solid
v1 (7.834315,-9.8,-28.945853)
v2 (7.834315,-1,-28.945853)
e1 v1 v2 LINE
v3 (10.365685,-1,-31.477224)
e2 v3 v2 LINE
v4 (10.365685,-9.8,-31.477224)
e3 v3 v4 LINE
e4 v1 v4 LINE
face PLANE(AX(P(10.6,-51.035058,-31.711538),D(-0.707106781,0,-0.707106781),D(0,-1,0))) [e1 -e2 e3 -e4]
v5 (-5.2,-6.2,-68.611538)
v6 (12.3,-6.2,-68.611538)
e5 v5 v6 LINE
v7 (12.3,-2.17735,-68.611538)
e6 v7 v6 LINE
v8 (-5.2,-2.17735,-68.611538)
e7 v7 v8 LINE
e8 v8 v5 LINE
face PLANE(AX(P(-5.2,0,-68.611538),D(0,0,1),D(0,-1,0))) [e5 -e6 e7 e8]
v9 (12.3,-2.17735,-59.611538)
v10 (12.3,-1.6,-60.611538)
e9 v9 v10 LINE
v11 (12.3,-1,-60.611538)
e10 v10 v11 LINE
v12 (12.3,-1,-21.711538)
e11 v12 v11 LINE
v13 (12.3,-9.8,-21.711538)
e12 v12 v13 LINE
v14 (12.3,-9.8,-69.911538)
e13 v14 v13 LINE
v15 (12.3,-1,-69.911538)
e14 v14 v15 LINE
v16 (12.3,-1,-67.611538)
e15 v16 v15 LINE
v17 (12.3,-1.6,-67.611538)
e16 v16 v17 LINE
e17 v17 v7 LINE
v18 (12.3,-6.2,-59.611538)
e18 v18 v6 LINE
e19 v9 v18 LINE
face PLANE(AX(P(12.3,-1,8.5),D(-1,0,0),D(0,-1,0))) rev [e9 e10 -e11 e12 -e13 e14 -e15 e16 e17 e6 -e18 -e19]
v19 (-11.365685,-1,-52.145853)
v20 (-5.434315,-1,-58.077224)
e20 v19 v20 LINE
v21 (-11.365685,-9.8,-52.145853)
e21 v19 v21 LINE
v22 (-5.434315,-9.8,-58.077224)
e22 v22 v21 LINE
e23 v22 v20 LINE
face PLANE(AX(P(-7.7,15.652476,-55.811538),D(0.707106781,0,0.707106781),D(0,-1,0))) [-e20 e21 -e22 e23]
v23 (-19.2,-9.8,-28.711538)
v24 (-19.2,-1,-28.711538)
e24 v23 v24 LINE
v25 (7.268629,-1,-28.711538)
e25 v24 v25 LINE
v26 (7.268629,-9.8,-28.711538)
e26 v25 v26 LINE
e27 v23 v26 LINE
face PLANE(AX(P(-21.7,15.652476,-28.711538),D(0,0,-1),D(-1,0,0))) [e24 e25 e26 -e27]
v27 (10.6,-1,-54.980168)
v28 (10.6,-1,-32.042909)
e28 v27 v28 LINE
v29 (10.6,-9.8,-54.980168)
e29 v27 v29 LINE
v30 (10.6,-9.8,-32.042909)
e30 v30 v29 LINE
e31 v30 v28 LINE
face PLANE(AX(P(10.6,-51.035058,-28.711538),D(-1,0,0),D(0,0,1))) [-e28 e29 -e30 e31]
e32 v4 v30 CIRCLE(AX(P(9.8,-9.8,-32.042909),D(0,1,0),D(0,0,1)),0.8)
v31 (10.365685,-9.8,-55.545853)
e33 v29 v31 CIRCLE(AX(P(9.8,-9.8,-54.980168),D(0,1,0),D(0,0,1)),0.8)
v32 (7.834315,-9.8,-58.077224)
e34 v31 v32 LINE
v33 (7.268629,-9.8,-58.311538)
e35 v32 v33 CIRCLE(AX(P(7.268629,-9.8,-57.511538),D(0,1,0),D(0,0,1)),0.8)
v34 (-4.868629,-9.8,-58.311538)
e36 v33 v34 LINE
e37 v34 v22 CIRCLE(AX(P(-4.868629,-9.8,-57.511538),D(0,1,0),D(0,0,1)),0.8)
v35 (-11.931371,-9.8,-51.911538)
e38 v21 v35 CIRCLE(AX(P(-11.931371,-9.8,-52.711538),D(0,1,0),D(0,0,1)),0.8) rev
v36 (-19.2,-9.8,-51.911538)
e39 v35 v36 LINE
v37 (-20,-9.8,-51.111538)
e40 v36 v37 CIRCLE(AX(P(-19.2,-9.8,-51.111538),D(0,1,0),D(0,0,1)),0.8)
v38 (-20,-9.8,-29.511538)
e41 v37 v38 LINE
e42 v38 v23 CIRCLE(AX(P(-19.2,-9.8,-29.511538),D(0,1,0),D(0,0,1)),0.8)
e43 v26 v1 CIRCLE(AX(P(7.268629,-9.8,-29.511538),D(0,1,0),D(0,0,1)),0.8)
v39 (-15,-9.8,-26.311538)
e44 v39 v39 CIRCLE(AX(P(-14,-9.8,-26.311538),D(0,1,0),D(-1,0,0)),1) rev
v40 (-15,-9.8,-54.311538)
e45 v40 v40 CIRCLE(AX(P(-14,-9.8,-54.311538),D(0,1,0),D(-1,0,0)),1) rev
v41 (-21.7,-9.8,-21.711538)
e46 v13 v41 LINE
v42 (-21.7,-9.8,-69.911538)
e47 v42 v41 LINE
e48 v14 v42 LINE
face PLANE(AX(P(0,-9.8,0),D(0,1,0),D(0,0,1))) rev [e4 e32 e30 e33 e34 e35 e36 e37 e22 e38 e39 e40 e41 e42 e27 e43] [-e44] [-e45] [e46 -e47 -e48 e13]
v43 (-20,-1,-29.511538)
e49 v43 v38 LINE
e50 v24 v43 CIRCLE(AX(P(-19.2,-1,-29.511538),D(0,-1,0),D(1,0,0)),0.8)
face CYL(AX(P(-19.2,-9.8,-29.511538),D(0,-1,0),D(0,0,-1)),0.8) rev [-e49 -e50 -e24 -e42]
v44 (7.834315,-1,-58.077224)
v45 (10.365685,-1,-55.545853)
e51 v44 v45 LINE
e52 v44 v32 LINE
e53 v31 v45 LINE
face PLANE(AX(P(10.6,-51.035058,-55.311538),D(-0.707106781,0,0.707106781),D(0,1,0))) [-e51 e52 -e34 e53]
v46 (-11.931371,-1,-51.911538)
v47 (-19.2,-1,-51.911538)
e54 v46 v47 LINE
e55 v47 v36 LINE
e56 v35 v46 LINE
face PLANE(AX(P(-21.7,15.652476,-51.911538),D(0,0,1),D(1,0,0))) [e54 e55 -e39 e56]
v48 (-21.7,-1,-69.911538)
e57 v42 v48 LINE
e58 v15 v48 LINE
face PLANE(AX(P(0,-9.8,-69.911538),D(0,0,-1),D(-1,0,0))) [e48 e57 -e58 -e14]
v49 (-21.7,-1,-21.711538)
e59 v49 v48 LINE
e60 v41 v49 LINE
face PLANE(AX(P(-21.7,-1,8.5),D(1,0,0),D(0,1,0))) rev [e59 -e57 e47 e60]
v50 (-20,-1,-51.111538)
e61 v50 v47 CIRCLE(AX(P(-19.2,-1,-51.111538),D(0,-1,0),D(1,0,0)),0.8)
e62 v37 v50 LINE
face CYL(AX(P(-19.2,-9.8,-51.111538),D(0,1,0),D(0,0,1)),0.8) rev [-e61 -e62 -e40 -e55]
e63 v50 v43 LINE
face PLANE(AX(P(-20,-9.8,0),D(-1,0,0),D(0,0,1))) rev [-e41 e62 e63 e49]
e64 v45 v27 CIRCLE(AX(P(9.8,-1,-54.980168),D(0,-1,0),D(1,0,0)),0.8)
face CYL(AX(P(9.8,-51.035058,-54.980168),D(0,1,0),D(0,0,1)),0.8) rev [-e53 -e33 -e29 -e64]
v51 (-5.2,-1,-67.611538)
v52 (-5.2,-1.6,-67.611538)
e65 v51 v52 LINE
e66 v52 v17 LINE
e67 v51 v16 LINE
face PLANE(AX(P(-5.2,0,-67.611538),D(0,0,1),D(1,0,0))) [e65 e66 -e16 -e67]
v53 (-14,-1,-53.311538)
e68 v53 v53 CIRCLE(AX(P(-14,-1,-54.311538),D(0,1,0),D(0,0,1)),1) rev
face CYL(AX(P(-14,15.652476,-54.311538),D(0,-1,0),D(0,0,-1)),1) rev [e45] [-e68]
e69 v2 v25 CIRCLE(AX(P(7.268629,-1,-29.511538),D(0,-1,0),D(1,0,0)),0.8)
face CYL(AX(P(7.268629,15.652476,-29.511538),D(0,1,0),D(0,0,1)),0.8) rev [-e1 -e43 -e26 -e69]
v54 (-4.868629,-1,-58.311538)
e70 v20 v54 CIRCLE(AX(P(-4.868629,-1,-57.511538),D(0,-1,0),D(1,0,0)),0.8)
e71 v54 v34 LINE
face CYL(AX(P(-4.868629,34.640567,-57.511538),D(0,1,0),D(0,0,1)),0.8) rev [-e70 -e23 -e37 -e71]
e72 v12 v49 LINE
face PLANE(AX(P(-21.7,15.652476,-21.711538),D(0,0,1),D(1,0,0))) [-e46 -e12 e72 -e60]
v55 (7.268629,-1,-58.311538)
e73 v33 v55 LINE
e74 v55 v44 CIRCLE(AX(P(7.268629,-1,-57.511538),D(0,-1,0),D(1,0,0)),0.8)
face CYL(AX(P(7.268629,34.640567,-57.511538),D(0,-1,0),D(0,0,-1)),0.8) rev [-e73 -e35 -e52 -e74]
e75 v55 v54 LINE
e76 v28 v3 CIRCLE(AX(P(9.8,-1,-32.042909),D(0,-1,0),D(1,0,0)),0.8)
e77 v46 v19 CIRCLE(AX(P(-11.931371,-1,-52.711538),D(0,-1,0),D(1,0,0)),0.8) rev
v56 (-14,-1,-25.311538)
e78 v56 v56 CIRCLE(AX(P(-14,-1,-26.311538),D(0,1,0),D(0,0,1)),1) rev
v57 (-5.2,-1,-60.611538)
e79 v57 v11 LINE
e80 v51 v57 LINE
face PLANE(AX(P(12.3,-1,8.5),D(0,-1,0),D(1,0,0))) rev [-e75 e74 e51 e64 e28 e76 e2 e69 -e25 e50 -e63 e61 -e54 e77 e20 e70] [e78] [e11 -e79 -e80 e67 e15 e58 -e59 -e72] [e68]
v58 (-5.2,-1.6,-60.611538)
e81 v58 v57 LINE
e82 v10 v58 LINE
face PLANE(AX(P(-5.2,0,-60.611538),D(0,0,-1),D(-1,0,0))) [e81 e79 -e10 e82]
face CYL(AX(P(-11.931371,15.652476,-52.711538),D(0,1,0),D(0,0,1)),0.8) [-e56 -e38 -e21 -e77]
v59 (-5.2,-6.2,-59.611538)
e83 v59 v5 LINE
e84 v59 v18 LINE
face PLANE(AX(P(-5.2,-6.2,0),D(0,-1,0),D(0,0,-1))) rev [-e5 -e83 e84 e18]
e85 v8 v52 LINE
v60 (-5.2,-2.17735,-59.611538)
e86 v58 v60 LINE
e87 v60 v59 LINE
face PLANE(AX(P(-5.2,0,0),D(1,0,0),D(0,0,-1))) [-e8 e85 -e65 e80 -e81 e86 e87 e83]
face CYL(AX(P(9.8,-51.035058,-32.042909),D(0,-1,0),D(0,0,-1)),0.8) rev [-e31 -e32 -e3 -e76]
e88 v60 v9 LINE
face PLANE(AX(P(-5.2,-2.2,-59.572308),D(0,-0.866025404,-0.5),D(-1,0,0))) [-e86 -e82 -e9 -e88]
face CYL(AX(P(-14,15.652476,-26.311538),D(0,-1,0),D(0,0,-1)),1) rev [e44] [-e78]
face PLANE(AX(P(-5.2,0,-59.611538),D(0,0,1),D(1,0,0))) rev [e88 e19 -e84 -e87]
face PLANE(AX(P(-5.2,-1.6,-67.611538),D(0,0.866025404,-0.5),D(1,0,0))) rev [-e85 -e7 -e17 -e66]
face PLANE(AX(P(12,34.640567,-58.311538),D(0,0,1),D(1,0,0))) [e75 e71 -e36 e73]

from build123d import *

# Parameters (mm, degrees)
BOSS_EXTRUDE1_START      = -1
SKETCH1_W                = 1.7
SKETCH1_H                = 89.2
BOSS_EXTRUDE1_DEPTH      = 8.8
SKETCH4_W                = 33.7
SKETCH4_H                = 11.6
BOSS_EXTRUDE3_DEPTH      = 8.8
SERVO_HOLDER_DEPTH       = 1
SERVO_HOLDER_DEPTH_BACK  = 8.8
SKETCH3_W                = 14
SKETCH3_H                = 7
SKETCH3_R                = 1
SKETCH37_W               = 20
SKETCH37_H               = 7
BOSS_EXTRUDE19_DEPTH     = 9.8
CUT_EXTRUDE10_DEPTH      = 93.434679639
CUT_EXTRUDE10_DEPTH_BACK = 93.434679639
SKETCH29_W               = 34.409909993
SKETCH29_H               = 6.377389624
BOSS_EXTRUDE13_START     = 2
SKETCH30_W               = 34
SKETCH30_H               = 38
SKETCH30_R               = 1.6
BOSS_EXTRUDE13_DEPTH     = 6.5
SKETCH41_W               = 17.288461538
SKETCH41_H               = 8.8
CUT_EXTRUDE14_DEPTH      = 15
BOSS_EXTRUDE14_START     = -38
SKETCH32_R               = 1.45
SKETCH32_R_2             = 5
BOSS_EXTRUDE14_DEPTH     = 8.8
BOSS_EXTRUDE16_DEPTH     = 3
BOSS_EXTRUDE17_DEPTH     = 3
BOSS_EXTRUDE18_DEPTH     = 8.8
SKETCH39_W               = 1.7
SKETCH39_H               = 41.2
BOSS_EXTRUDE20_DEPTH     = 8.8
CUT_EXTRUDE13_DEPTH      = 17.5
CHAMFER2_SIZE            = 0.6
CHAMFER2_SIZE_2          = 1.039230485
CHAMFER3_SIZE            = 3
FILLET10_R               = 6
CUT_EXTRUDE15_DEPTH      = 10
CHAMFER4_SIZE            = 2.5
CUT_EXTRUDE16_DEPTH      = 10
FILLET11_R               = 0.8
SKETCH44_W               = 59.192885725
SKETCH44_H               = 45.417181718
CUT_EXTRUDE17_DEPTH      = 87.948983376


with BuildPart() as part:
    # Sketch1 → Boss-Extrude1 (new body)
    with BuildSketch(Plane(origin=(0, 0, 0), x_dir=(1, 0, 0), z_dir=(0, 1, 0)).offset(BOSS_EXTRUDE1_START)):
        with Locations((-20.85, 25.311538462)):
            Rectangle(SKETCH1_W, SKETCH1_H)
    extrude(amount=-BOSS_EXTRUDE1_DEPTH)

    # Sketch4 → Boss-Extrude3 (add)
    with BuildSketch(Plane.XZ.offset(9.8)):
        with Locations((-4.85, -64.111538462)):
            Rectangle(SKETCH4_W, SKETCH4_H)
    extrude(amount=-BOSS_EXTRUDE3_DEPTH)

    # Sketch3 → Servo Holder (add, two sides: drawn at the far end of the back side and taken through both)
    # profile 1 of 2: a face of its own
    with BuildSketch(Plane.XZ.offset(9.8).offset(-SERVO_HOLDER_DEPTH_BACK)):
        with Locations((-14.7, -55.411538462)):
            Rectangle(SKETCH3_W, SKETCH3_H)
        with Locations(Location((-14, -54.311538462, 0), (0, 0, 270))):
            Circle(SKETCH3_R, mode=Mode.SUBTRACT)
    # profile 2 of 2: a face of its own
    with BuildSketch(Plane.XZ.offset(9.8).offset(-SERVO_HOLDER_DEPTH_BACK)):
        with Locations((-14.7, -25.211538462)):
            Rectangle(SKETCH3_W, SKETCH3_H)
        with Locations(Location((-14, -26.311538462, 0), (0, 0, 90))):
            Circle(SKETCH3_R, mode=Mode.SUBTRACT)
    extrude(amount=SERVO_HOLDER_DEPTH + SERVO_HOLDER_DEPTH_BACK)

    # Sketch37 → Boss-Extrude19 (add)
    with BuildSketch(Plane(origin=(0, -1, 0), x_dir=(1, 0, 0), z_dir=(0, 1, 0))):
        with Locations((2.3, 25.211538462)):
            Rectangle(SKETCH37_W, SKETCH37_H)
    extrude(amount=-BOSS_EXTRUDE19_DEPTH)

    # Sketch29 → Cut-Extrude10 (cut, two sides: drawn at the far end of the back side and taken through both)
    with BuildSketch(Plane(origin=(0, 0, -69.911538462), x_dir=(-1, 0, 0), z_dir=(0, 0, -1)).offset(-CUT_EXTRUDE10_DEPTH_BACK)):
        with Locations((4.495045004, -12.988694812)):
            Rectangle(SKETCH29_W, SKETCH29_H)
    extrude(amount=CUT_EXTRUDE10_DEPTH + CUT_EXTRUDE10_DEPTH_BACK, mode=Mode.SUBTRACT)


with BuildPart() as body_2:
    # Sketch30 → Boss-Extrude13 (new body)
    with BuildSketch(Plane.XY.offset(BOSS_EXTRUDE13_START)):
        with Locations((-4.7, -20)):
            Rectangle(SKETCH30_W, SKETCH30_H)
        with Locations(Location((5.3, -34, 0), (0, 0, 180))):
            Circle(SKETCH30_R, mode=Mode.SUBTRACT)
        with Locations(Location((5.3, -19, 0), (0, 0, 180))):
            Circle(SKETCH30_R, mode=Mode.SUBTRACT)
        with Locations(Location((-14.7, -34, 0), (0, 0, 180))):
            Circle(SKETCH30_R, mode=Mode.SUBTRACT)
        with Locations(Location((-14.7, -19, 0), (0, 0, 180))):
            Circle(SKETCH30_R, mode=Mode.SUBTRACT)
    extrude(amount=BOSS_EXTRUDE13_DEPTH)


with BuildPart() as cut_extrude14_tool:
    # Sketch41 → Cut-Extrude14 (new body)
    with BuildSketch(Plane(origin=(-20, 0, 0), x_dir=(0, 0, -1), z_dir=(1, 0, 0))):
        with Locations((-10.644230769, -5.4)):
            Rectangle(SKETCH41_W, SKETCH41_H)
    extrude(amount=-CUT_EXTRUDE14_DEPTH)


with BuildPart() as part_1:
    add(part.part)

    # Cut-Extrude14: cut by cut_extrude14_tool
    add(cut_extrude14_tool.part, mode=Mode.SUBTRACT)



with BuildPart() as body_2_1:
    add(body_2.part)

    # Cut-Extrude14: cut by cut_extrude14_tool
    add(cut_extrude14_tool.part, mode=Mode.SUBTRACT)

    # Sketch32 → Boss-Extrude14 (add)
    with BuildSketch(Plane.XZ.offset(39).offset(BOSS_EXTRUDE14_START)):
        with BuildLine():
            ThreePointArc((11.872921748, 2), (25.925390485, -3.535644523), (35.05, 8.5))
            ThreePointArc((35.05, 8.5), (22.55, 21), (10.05, 8.5))
            Line((10.05, 8.5), (12.3, 8.5))
            Line((12.3, 8.5), (12.3, 2))
            Line((12.3, 2), (11.872921748, 2))
        make_face()
        with Locations(Location((15.25884337, 2.409923235, 0), (0, 0, 180))):
            Circle(SKETCH32_R, mode=Mode.SUBTRACT)
        with Locations(Location((28.640076765, 1.20884337, 0), (0, 0, 180))):
            Circle(SKETCH32_R, mode=Mode.SUBTRACT)
        with Locations(Location((16.459923235, 15.79115663, 0), (0, 0, 180))):
            Circle(SKETCH32_R, mode=Mode.SUBTRACT)
        with Locations(Location((22.55, 8.5, 0), (0, 0, 180))):
            Circle(SKETCH32_R_2, mode=Mode.SUBTRACT)
        with Locations(Location((29.84115663, 14.590076765, 0), (0, 0, 180))):
            Circle(SKETCH32_R, mode=Mode.SUBTRACT)
    extrude(amount=BOSS_EXTRUDE14_DEPTH)


with BuildPart() as part_2:
    add(part_1.part)

    add(body_2_1.part)  # Boss-Extrude16 merges body 2
    # Sketch34 → Boss-Extrude16 (add)
    with BuildSketch(Plane.ZY.offset(21.7)):
        Polygon((-21.711538462, -1), (-21.711538462, -9.8), (2, -39), (8.5, -39), (8.5, -1), align=None)
    extrude(amount=-BOSS_EXTRUDE16_DEPTH)

    # Sketch35 → Boss-Extrude17 (add)
    with BuildSketch(Plane(origin=(12.3, 0, 0), x_dir=(0, 0, -1), z_dir=(1, 0, 0))):
        Polygon((-2, -1), (21.711538462, -1), (21.711538462, -9.8), (-2, -39), (-8.5, -39), (-8.5, -9.8), (-8.5, -1), align=None)
    extrude(amount=-BOSS_EXTRUDE17_DEPTH)

    # Sketch36 → Boss-Extrude18 (add)
    with BuildSketch(Plane.XZ.offset(9.8)):
        Polygon((12.3, -10.579162849), (16.63422252, -2.511520186), (12.3, 1.345455989), align=None)
    extrude(amount=-BOSS_EXTRUDE18_DEPTH)

    # Sketch39 → Boss-Extrude20 (add)
    with BuildSketch(Plane(origin=(0, -1, 0), x_dir=(1, 0, 0), z_dir=(0, 1, 0))):
        with Locations((11.45, 49.311538462)):
            Rectangle(SKETCH39_W, SKETCH39_H)
    extrude(amount=-BOSS_EXTRUDE20_DEPTH)

    # Sketch40 → Cut-Extrude13 (cut)
    with BuildSketch(Plane(origin=(12.3, 0, 0), x_dir=(0, 0, -1), z_dir=(1, 0, 0))):
        Polygon((64.111538462, -1), (60.611538462, -1), (60.611538462, -2.2), (59.611538462, -2.2), (59.611538462, -6.2), (64.111538462, -6.2), align=None)
        Polygon((67.611538462, -1), (64.111538462, -1), (64.111538462, -6.2), (68.611538462, -6.2), (68.611538462, -2.2), (67.611538462, -2.2), align=None)
    extrude(amount=-CUT_EXTRUDE13_DEPTH, mode=Mode.SUBTRACT)

    # Chamfer2
    # the kernel refuses this chamfer: 1.039230485, 0.6 mm, written as the material it takes off along each edge
    with BuildSketch(Plane(origin=(14.988578382, -2.2, -67.611538462), x_dir=(0, 0.9983227437537925, 0.05789386240267319), z_dir=(-1, 0, 0))) as chamfer2_piece_1_section:
        Polygon((CHAMFER2_SIZE * 0.998322743754, CHAMFER2_SIZE * 0.0578938624027), (-CHAMFER2_SIZE_2 * 0.0578938623771, CHAMFER2_SIZE_2 * 0.998322743313), (0, 0), align=None)
    chamfer2_piece_1 = extrude(amount=20.188578382, mode=Mode.PRIVATE)
    chamfer2_piece_1 = split(chamfer2_piece_1, bisect_by=Plane(origin=(4.894289191, -2.005782009, -68.611538462), z_dir=(0, 0, 1)), keep=Keep.TOP, mode=Mode.PRIVATE)
    add(chamfer2_piece_1, mode=Mode.SUBTRACT)
    with BuildSketch(Plane(origin=(14.988578382, -2.2, -60.611538462), x_dir=(0, 0.9983227437537925, -0.05789386240267317), z_dir=(-1, 0, 0))) as chamfer2_piece_2_section:
        Polygon((CHAMFER2_SIZE * 0.998322743754, -CHAMFER2_SIZE * 0.0578938624027), (-CHAMFER2_SIZE_2 * 0.0578938623771, -CHAMFER2_SIZE_2 * 0.998322743313), (0, 0), align=None)
    chamfer2_piece_2 = extrude(amount=20.188578382, mode=Mode.PRIVATE)
    chamfer2_piece_2 = split(chamfer2_piece_2, bisect_by=Plane(origin=(4.894289191, -2.005782009, -59.611538462), z_dir=(0, 0, -1)), keep=Keep.TOP, mode=Mode.PRIVATE)
    add(chamfer2_piece_2, mode=Mode.SUBTRACT)

    # Chamfer3
    chamfer3_edges = [part_2.edges().sort_by_distance(p)[0] for p in [
        (10.6, -5.4, -58.311538462),
        (10.6, -5.4, -28.711538462),
    ]]
    chamfer(chamfer3_edges, length=CHAMFER3_SIZE)

    # Fillet10
    fillet10_edges = [part_2.edges().sort_by_distance(p)[0] for p in [
        (16.63422252, -5.4, -2.511520186),
        (12.3, -5.4, -10.579162849),
    ]]
    fillet(fillet10_edges, radius=FILLET10_R)

    # Sketch42 → Cut-Extrude15 (cut)
    with BuildSketch(Plane.XY.offset(8.5)):
        with BuildLine():
            Line((-1.1, -1), (-1.1, -10.6))
            ThreePointArc((-1.1, -10.6), (-4.7, -14.2), (-8.3, -10.6))
            Line((-8.3, -10.6), (-8.3, -1))
            Line((-8.3, -1), (-1.1, -1))
        make_face()
    extrude(amount=-CUT_EXTRUDE15_DEPTH, mode=Mode.SUBTRACT)

    # Chamfer4
    chamfer4_edges = [part_2.edges().sort_by_distance(p)[0] for p in [
        (-7.7, -5.4, -58.311538462),
    ]]
    chamfer(chamfer4_edges, length=CHAMFER4_SIZE)

    # Sketch43 → Cut-Extrude16 (cut)
    with BuildSketch(Plane(origin=(0, -1, 0), x_dir=(1, 0, 0), z_dir=(0, 1, 0))):
        Polygon((-5.2, 58.311538462), (-11.6, 51.911538462), (-5.2, 51.911538462), align=None)
    extrude(amount=-CUT_EXTRUDE16_DEPTH, mode=Mode.SUBTRACT)

    # Fillet11
    fillet11_edges = [part_2.edges().sort_by_distance(p)[0] for p in [
        (-20, -5.4, -28.711538462),
        (-20, -5.4, -51.911538462),
        (10.6, -5.4, -55.311538462),
        (10.6, -5.4, -31.711538462),
        (7.6, -5.4, -28.711538462),
        (7.6, -5.4, -58.311538462),
        (-5.2, -5.4, -58.311538462),
        (-11.6, -5.4, -51.911538462),
    ]]
    fillet(fillet11_edges, radius=FILLET11_R)

    # Sketch44 → Cut-Extrude17 (cut, through all)
    with BuildSketch(Plane(origin=(0, -1, 0), x_dir=(1, 0, 0), z_dir=(0, 1, 0))):
        with Locations((7.896442862, -0.997052397)):
            Rectangle(SKETCH44_W, SKETCH44_H)
    extrude(amount=-CUT_EXTRUDE17_DEPTH, mode=Mode.SUBTRACT)


solid = part_2.part
